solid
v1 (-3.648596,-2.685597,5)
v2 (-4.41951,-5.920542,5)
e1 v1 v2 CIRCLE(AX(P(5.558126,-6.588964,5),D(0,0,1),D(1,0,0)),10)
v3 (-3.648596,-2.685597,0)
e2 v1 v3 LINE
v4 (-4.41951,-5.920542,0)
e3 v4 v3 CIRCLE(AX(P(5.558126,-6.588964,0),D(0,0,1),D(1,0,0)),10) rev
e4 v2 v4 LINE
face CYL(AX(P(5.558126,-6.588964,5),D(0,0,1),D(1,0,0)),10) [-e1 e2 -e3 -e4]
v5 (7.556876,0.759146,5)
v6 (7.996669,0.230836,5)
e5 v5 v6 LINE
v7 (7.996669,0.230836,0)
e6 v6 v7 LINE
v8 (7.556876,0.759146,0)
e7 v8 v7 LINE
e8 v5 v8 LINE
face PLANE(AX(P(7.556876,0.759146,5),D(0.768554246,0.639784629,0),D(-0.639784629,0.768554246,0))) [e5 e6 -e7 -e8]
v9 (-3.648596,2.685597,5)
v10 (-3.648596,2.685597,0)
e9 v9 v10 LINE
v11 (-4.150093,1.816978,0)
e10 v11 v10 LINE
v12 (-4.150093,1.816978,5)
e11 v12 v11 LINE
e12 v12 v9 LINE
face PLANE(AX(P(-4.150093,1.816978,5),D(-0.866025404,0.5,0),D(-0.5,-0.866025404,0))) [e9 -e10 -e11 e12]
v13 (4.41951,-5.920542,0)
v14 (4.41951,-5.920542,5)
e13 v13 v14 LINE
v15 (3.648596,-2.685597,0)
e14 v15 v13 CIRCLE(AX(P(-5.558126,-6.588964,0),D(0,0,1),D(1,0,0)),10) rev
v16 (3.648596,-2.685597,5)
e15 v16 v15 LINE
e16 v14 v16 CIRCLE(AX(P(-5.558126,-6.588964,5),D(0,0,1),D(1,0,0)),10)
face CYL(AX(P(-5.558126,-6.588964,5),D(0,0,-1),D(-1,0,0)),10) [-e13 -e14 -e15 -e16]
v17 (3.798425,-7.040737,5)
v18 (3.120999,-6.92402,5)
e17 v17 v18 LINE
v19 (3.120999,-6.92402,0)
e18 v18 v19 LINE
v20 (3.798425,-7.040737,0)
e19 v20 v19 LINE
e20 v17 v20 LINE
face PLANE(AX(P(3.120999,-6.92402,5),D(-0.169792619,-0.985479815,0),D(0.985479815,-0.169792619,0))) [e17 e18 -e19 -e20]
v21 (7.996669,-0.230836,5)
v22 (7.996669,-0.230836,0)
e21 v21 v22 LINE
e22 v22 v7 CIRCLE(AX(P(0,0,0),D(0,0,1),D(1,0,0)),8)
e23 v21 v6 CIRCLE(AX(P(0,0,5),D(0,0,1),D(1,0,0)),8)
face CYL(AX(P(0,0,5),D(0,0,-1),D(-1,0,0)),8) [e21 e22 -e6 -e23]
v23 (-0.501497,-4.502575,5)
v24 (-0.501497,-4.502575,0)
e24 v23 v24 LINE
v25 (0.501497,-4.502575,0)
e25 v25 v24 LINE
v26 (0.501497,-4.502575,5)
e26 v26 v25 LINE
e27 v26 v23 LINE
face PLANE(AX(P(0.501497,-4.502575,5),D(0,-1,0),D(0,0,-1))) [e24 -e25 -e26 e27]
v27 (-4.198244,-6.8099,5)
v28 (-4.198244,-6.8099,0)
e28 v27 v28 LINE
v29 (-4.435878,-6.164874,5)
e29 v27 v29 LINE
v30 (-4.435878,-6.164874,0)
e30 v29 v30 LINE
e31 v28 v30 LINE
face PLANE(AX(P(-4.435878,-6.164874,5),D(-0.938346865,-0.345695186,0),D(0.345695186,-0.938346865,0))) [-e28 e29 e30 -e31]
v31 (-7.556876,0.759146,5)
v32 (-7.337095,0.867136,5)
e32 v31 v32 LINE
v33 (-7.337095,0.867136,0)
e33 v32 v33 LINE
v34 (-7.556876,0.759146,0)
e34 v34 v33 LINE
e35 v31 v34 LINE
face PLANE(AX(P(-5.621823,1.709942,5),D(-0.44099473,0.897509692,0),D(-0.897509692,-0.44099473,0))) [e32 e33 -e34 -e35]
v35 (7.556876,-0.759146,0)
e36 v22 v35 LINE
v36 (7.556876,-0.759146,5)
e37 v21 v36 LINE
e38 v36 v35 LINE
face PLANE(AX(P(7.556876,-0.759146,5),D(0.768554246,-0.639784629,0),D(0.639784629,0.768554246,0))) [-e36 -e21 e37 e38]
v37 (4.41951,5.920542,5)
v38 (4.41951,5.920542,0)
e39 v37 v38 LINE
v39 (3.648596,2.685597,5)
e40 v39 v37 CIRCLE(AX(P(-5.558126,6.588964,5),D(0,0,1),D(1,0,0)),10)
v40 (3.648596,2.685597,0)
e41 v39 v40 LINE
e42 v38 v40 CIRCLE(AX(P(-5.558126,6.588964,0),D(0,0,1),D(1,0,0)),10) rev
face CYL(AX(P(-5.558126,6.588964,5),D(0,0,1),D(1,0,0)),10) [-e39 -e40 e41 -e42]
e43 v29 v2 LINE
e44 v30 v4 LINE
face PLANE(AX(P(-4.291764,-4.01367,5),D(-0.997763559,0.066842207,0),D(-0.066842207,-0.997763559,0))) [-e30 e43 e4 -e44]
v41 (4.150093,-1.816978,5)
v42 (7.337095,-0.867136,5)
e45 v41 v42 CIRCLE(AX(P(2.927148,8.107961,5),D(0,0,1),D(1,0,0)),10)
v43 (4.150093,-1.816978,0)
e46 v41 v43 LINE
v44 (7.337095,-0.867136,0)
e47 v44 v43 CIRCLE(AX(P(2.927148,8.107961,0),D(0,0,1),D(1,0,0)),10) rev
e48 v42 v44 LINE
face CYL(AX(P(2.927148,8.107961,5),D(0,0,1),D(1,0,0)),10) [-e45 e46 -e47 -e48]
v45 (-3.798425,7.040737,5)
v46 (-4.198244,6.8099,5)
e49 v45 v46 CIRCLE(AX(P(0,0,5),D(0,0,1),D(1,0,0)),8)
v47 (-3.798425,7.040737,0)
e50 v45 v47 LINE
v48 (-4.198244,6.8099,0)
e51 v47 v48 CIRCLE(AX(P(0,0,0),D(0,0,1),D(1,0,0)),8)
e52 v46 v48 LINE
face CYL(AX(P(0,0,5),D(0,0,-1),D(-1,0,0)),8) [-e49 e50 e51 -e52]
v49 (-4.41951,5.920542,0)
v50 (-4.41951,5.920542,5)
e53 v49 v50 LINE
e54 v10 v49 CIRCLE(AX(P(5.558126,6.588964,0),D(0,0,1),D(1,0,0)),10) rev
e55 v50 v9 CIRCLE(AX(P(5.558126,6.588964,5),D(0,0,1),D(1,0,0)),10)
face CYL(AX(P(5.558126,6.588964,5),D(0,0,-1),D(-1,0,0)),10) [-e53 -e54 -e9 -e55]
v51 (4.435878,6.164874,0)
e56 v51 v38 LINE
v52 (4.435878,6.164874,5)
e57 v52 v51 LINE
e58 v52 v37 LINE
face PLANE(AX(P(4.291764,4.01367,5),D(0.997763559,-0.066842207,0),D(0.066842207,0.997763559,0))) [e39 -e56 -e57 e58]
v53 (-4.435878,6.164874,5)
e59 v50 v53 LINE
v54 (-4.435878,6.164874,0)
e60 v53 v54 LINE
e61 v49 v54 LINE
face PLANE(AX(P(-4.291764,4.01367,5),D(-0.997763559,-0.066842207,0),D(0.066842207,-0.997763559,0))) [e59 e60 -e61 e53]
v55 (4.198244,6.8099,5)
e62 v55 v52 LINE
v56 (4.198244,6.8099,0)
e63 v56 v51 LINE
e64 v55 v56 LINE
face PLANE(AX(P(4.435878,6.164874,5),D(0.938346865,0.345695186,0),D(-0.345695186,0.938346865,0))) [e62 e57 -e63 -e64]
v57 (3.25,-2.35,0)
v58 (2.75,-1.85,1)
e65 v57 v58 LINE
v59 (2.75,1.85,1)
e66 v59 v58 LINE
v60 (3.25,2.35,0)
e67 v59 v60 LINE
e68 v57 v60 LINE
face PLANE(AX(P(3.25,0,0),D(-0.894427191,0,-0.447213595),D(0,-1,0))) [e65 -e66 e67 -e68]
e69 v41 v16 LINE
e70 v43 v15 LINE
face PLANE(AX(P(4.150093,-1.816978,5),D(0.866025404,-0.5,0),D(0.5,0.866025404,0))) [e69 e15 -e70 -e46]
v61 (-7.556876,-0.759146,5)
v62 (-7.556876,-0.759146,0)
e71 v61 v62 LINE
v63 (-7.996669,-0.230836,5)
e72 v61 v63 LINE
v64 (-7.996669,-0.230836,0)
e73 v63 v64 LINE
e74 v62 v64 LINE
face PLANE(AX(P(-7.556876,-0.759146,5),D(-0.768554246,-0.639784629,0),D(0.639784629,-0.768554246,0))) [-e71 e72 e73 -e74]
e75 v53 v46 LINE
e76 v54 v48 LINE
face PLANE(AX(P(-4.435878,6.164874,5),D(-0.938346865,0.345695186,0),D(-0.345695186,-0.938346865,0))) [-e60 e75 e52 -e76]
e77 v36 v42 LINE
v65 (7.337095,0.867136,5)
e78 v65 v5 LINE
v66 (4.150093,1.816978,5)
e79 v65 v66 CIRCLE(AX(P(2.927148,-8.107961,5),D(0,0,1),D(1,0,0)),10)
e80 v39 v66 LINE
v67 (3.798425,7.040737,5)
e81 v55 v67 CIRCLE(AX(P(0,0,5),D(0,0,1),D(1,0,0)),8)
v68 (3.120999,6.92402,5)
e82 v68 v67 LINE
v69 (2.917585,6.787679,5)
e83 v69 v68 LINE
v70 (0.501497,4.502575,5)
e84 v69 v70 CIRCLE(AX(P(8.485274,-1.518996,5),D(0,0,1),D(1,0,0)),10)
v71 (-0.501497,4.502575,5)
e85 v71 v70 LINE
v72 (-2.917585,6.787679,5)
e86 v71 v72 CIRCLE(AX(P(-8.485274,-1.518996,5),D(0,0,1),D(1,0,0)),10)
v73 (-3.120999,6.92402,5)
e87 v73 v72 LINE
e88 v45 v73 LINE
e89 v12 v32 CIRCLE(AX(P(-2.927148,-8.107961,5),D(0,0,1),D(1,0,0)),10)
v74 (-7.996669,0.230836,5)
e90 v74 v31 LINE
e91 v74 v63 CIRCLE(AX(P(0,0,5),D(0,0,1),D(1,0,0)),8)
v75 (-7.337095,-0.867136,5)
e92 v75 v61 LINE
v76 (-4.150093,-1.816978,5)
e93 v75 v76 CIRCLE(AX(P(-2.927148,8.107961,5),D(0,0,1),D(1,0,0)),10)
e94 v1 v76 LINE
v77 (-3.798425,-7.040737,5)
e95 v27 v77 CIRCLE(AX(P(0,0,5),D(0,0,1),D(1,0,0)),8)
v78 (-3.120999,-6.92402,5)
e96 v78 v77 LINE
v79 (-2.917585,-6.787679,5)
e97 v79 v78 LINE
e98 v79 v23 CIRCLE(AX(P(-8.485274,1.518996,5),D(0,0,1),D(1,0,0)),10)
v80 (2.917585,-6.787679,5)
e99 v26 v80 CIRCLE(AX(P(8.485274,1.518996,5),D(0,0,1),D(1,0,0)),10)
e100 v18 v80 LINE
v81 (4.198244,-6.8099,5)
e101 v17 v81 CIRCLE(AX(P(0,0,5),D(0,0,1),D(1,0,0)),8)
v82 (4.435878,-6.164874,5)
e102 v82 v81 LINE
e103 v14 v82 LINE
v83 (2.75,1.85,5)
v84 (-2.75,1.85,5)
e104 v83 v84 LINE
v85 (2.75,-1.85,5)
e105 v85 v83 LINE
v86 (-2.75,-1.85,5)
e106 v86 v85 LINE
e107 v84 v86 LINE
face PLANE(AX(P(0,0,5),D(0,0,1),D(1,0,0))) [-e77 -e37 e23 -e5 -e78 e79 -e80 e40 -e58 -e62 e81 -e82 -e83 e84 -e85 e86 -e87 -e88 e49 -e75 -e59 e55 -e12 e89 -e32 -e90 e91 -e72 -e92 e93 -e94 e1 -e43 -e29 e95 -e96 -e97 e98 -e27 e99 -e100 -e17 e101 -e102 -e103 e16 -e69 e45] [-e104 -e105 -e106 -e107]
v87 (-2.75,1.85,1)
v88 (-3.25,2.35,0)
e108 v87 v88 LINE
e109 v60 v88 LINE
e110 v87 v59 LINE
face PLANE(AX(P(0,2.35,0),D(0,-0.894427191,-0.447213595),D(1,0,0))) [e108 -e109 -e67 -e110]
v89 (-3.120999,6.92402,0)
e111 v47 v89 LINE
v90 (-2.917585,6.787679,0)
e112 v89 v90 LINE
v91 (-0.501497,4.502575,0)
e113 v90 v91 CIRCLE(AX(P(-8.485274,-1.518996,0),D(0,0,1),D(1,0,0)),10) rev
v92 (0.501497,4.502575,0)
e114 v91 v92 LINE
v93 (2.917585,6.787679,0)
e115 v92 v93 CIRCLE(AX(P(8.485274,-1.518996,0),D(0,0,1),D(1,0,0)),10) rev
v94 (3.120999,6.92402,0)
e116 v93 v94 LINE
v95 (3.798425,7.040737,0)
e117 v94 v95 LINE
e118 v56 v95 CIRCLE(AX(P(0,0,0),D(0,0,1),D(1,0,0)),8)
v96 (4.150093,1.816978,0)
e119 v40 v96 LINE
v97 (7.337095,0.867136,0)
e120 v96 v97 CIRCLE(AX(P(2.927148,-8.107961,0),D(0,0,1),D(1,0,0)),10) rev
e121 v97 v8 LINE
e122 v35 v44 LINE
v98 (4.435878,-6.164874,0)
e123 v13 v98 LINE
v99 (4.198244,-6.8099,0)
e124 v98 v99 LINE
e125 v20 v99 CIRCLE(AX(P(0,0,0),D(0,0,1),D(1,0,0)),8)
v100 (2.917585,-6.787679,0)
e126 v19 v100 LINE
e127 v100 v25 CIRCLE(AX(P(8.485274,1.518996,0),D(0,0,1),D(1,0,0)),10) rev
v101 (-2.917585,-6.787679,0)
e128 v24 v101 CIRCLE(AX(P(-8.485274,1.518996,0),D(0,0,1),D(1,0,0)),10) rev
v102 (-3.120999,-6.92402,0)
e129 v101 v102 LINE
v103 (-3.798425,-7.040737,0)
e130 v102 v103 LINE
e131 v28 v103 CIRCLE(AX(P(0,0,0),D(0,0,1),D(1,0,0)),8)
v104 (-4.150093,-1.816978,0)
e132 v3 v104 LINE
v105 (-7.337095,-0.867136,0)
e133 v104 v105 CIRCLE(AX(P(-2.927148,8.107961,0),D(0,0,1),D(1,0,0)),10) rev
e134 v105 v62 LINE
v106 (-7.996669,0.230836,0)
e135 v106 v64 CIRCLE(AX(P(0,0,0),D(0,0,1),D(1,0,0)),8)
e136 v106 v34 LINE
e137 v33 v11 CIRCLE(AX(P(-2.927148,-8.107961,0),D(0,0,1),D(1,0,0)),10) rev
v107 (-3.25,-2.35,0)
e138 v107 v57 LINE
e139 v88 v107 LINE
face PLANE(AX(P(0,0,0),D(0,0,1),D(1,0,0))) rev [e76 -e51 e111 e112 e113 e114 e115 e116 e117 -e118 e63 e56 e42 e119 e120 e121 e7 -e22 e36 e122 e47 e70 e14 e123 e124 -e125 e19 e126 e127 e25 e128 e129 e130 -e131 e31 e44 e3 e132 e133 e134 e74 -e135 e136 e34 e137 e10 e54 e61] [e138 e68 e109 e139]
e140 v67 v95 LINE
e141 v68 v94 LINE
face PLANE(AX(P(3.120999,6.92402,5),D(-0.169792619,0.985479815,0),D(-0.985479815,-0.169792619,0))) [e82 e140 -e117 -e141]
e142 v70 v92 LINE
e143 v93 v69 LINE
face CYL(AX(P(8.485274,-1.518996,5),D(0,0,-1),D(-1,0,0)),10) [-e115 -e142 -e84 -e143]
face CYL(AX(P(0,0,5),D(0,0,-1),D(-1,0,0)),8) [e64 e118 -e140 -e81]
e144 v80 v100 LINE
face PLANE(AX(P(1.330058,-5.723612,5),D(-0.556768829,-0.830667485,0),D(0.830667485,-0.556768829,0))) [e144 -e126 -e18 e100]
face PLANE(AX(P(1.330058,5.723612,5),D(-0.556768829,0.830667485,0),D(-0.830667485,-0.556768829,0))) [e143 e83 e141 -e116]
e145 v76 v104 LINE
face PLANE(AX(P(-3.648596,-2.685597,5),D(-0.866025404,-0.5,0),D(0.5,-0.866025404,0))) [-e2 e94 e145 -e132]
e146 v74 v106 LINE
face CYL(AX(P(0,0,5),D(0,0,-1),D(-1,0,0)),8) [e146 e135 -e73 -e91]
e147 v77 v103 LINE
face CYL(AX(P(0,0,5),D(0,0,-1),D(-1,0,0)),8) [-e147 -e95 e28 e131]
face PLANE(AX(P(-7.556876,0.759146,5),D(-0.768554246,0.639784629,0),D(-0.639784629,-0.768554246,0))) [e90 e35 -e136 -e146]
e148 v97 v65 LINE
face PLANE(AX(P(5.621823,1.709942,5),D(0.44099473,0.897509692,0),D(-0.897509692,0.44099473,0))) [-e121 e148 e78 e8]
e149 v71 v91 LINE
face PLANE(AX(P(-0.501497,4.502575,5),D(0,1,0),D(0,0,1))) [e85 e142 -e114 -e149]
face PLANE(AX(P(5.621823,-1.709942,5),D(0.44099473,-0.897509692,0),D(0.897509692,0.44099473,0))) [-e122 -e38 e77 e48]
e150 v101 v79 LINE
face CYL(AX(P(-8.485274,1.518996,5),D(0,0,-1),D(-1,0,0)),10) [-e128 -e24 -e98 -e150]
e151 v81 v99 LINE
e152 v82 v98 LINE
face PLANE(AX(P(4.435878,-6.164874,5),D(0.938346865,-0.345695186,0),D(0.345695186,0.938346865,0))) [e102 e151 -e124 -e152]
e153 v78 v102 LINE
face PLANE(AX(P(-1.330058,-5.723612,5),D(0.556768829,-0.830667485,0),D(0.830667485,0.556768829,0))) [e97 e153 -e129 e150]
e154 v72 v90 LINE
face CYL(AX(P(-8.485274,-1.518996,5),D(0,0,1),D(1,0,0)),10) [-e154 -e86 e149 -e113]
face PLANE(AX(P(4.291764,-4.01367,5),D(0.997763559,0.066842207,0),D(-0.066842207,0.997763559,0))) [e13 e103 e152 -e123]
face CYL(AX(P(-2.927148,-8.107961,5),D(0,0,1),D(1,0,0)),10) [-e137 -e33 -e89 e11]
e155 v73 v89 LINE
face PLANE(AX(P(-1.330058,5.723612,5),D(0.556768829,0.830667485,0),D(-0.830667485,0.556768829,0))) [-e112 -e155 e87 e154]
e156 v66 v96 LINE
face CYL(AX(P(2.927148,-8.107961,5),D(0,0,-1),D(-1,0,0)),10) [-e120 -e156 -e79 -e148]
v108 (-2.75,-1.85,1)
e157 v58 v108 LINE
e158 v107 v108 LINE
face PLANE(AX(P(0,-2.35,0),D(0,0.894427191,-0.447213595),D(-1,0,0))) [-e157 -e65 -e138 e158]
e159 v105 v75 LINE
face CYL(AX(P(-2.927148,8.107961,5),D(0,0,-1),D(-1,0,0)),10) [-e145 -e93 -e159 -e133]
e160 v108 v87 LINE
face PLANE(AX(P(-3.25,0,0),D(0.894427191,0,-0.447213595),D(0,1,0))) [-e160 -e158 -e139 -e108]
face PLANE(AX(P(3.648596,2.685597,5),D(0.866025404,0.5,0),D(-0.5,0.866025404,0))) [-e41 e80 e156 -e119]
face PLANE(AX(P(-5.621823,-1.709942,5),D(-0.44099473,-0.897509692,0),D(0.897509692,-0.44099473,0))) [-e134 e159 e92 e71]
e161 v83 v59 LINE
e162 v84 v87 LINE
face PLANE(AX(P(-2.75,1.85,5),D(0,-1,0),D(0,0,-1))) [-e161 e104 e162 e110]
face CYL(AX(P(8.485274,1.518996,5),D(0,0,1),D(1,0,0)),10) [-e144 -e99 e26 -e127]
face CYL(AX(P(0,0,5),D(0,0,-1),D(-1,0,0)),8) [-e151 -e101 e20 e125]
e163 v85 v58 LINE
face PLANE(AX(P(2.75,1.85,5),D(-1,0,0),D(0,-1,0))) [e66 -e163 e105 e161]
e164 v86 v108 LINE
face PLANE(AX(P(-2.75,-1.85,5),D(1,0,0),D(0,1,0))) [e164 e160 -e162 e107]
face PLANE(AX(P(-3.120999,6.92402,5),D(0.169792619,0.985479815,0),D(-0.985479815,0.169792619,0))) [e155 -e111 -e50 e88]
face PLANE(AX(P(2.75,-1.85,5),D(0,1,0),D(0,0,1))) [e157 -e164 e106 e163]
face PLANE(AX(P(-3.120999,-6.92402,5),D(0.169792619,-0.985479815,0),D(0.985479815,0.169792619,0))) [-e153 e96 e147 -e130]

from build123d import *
from OCP.BRepFilletAPI import BRepFilletAPI_MakeChamfer

# Parameters (mm, degrees)
SKETCH1_R           = 8
SKETCH1_W           = 5.5
SKETCH1_H           = 3.7
BOSS_EXTRUDE1_DEPTH = 5
CUT_EXTRUDE1_DEPTH  = 13.369316877
CIRPATTERN1_COUNT   = 6
FILLET1_R           = 10
CHAMFER1_SIZE       = 1
CHAMFER1_SIZE2      = 0.5


with BuildPart() as part:
    # Sketch1 → Boss-Extrude1 (new body)
    with BuildSketch(Plane.XY):
        Circle(SKETCH1_R)
        Rectangle(SKETCH1_W, SKETCH1_H, mode=Mode.SUBTRACT)
    extrude(amount=BOSS_EXTRUDE1_DEPTH)

    # Sketch2 → Cut-Extrude1 (cut, through all)
    with BuildSketch(Plane.XY):
        Polygon((-7.331932906, 22.221764399), (0, 24.952212466), (7.331932906, 22.221764399), (3.798424573, 7.040736522), (3.120998591, 6.924019842), (1.330058439, 5.723612136), (0.501497444, 4.50257488), (-0.501497444, 4.50257488), (-1.330058439, 5.723612136), (-3.120998591, 6.924019842), (-3.798424573, 7.040736522), align=None)
    cut_extrude1 = extrude(amount=CUT_EXTRUDE1_DEPTH, mode=Mode.SUBTRACT)

    # CirPattern1: Cut-Extrude1 ×6 about axis
    cirpattern1_axis = Axis((0, 0, 0), (0, 0, 1))
    for i in range(1, CIRPATTERN1_COUNT):
        add(cut_extrude1.rotate(cirpattern1_axis, i * 360 / CIRPATTERN1_COUNT), mode=Mode.SUBTRACT)

    # Fillet1
    # the kernel refuses this fillet: 10 mm, written as the material it takes off along each edge
    with BuildSketch(Plane(origin=(-1.330058439, -5.723612136, -4.777865205), x_dir=(0.5615014183372642, 0.8274757743917586, 0), z_dir=(0, 0, 1)), Plane(origin=(5.621822731, 1.709941671, -4.777865205), x_dir=(-0.997365750808096, 0.07253660534518461, 0), z_dir=(0, 0, 1)), Plane(origin=(4.291764291, -4.013670465, -4.777865205), x_dir=(-0.43586433247083195, 0.9000123797369435, 0), z_dir=(0, 0, 1)), Plane(origin=(-5.621822731, -1.709941671, -4.777865205), x_dir=(0.997365750808096, -0.07253660534518423, 0), z_dir=(0, 0, 1)), Plane(origin=(-4.291764291, 4.013670465, -4.777865205), x_dir=(0.43586433247083256, -0.900012379736943, 0), z_dir=(0, 0, 1)), Plane(origin=(1.330058439, 5.723612136, -4.777865205), x_dir=(-0.561501418337264, -0.8274757743917588, 0), z_dir=(0, 0, 1))) as fillet1_piece_1:
        with BuildLine():
            CenterArc((1.975419419, 9.987502063), FILLET1_R, 247.992328485, 19.142820558)
            Line((-1.771887917, 0.716165173), (-1.846834064, 0.530738436))
            Line((-1.846834064, 0.530738436), (-0.074946147, -0.185426738))
            Line((-0.074946147, -0.185426738), (0, -0.2))
            ThreePointArc((0, -0.2), (0.737808461, -0.2), (1.465620873, -0.199750041))
            Line((1.465620873, -0.199750041), (1.475616922, 0))
        make_face()
    extrude(amount=14.55573041, mode=Mode.SUBTRACT)
    with BuildSketch(Plane(origin=(5.621822731, -1.709941671, -4.777865205), x_dir=(0.8975096924716217, 0.44099473003596645, 0), z_dir=(0, 0, 1)), Plane(origin=(1.330058439, -5.723612136, -4.777865205), x_dir=(0.8306674853820185, -0.5567688288052, 0), z_dir=(0, 0, 1)), Plane(origin=(-4.291764291, -4.013670465, -4.777865205), x_dir=(-0.06684220708960342, -0.9977635588411669, 0), z_dir=(0, 0, 1)), Plane(origin=(-5.621822731, 1.709941671, -4.777865205), x_dir=(-0.8975096924716216, -0.44099473003596684, 0), z_dir=(0, 0, 1)), Plane(origin=(4.291764291, 4.013670465, -4.777865205), x_dir=(0.06684220708960296, 0.9977635588411669, 0), z_dir=(0, 0, 1)), Plane(origin=(-1.330058439, 5.723612136, -4.777865205), x_dir=(-0.8306674853820185, 0.5567688288052001, 0), z_dir=(0, 0, 1))) as fillet1_piece_2:
        with BuildLine():
            CenterArc((1.911146082, 10), FILLET1_R, 250.857179442, 19.142820558)
            Line((-1.368094161, 0.552959012), (-1.433678966, 0.364018192))
            ThreePointArc((-1.433678966, 0.364018192), (-0.758993227, 0.091052768), (-0.074946147, -0.185426738))
            Line((-0.074946147, -0.185426738), (0, -0.2))
            Line((0, -0.2), (1.911146082, -0.2))
            Line((1.911146082, -0.2), (1.911146082, 0))
        make_face()
    extrude(amount=14.55573041, mode=Mode.SUBTRACT)

    # Chamfer1: one chamfer whose edges measure the first distance from different faces: ONE call of the kernel's chamfer builder (chamfer() names one face for all edges)
    chamfer1_edges_1 = [part.edges().sort_by_distance(p)[0] for p in [
        (-2.75, 0, 0),
    ]]
    chamfer1_side_1 = [part.faces().sort_by_distance(p)[0] for p in [
        (-2.75, 0, 2.5),
    ]]
    chamfer1_edges_2 = [part.edges().sort_by_distance(p)[0] for p in [
        (0, -1.85, 0),
    ]]
    chamfer1_side_2 = [part.faces().sort_by_distance(p)[0] for p in [
        (0, -1.85, 2.5),
    ]]
    chamfer1_edges_3 = [part.edges().sort_by_distance(p)[0] for p in [
        (2.75, 0, 0),
    ]]
    chamfer1_side_3 = [part.faces().sort_by_distance(p)[0] for p in [
        (2.75, 0, 2.5),
    ]]
    chamfer1_edges_4 = [part.edges().sort_by_distance(p)[0] for p in [
        (0, 1.85, 0),
    ]]
    chamfer1_side_4 = [part.faces().sort_by_distance(p)[0] for p in [
        (0, 1.85, 2.5),
    ]]
    chamfer1 = BRepFilletAPI_MakeChamfer(part.part.solid().wrapped)
    for e in chamfer1_edges_1:
        chamfer1.Add(CHAMFER1_SIZE, CHAMFER1_SIZE2, e.wrapped, chamfer1_side_1[0].wrapped)  # the first distance lies on this face
    for e in chamfer1_edges_2:
        chamfer1.Add(CHAMFER1_SIZE, CHAMFER1_SIZE2, e.wrapped, chamfer1_side_2[0].wrapped)  # the first distance lies on this face
    for e in chamfer1_edges_3:
        chamfer1.Add(CHAMFER1_SIZE, CHAMFER1_SIZE2, e.wrapped, chamfer1_side_3[0].wrapped)  # the first distance lies on this face
    for e in chamfer1_edges_4:
        chamfer1.Add(CHAMFER1_SIZE, CHAMFER1_SIZE2, e.wrapped, chamfer1_side_4[0].wrapped)  # the first distance lies on this face
    add(Compound.cast(chamfer1.Shape()), mode=Mode.REPLACE)


solid = part.part
